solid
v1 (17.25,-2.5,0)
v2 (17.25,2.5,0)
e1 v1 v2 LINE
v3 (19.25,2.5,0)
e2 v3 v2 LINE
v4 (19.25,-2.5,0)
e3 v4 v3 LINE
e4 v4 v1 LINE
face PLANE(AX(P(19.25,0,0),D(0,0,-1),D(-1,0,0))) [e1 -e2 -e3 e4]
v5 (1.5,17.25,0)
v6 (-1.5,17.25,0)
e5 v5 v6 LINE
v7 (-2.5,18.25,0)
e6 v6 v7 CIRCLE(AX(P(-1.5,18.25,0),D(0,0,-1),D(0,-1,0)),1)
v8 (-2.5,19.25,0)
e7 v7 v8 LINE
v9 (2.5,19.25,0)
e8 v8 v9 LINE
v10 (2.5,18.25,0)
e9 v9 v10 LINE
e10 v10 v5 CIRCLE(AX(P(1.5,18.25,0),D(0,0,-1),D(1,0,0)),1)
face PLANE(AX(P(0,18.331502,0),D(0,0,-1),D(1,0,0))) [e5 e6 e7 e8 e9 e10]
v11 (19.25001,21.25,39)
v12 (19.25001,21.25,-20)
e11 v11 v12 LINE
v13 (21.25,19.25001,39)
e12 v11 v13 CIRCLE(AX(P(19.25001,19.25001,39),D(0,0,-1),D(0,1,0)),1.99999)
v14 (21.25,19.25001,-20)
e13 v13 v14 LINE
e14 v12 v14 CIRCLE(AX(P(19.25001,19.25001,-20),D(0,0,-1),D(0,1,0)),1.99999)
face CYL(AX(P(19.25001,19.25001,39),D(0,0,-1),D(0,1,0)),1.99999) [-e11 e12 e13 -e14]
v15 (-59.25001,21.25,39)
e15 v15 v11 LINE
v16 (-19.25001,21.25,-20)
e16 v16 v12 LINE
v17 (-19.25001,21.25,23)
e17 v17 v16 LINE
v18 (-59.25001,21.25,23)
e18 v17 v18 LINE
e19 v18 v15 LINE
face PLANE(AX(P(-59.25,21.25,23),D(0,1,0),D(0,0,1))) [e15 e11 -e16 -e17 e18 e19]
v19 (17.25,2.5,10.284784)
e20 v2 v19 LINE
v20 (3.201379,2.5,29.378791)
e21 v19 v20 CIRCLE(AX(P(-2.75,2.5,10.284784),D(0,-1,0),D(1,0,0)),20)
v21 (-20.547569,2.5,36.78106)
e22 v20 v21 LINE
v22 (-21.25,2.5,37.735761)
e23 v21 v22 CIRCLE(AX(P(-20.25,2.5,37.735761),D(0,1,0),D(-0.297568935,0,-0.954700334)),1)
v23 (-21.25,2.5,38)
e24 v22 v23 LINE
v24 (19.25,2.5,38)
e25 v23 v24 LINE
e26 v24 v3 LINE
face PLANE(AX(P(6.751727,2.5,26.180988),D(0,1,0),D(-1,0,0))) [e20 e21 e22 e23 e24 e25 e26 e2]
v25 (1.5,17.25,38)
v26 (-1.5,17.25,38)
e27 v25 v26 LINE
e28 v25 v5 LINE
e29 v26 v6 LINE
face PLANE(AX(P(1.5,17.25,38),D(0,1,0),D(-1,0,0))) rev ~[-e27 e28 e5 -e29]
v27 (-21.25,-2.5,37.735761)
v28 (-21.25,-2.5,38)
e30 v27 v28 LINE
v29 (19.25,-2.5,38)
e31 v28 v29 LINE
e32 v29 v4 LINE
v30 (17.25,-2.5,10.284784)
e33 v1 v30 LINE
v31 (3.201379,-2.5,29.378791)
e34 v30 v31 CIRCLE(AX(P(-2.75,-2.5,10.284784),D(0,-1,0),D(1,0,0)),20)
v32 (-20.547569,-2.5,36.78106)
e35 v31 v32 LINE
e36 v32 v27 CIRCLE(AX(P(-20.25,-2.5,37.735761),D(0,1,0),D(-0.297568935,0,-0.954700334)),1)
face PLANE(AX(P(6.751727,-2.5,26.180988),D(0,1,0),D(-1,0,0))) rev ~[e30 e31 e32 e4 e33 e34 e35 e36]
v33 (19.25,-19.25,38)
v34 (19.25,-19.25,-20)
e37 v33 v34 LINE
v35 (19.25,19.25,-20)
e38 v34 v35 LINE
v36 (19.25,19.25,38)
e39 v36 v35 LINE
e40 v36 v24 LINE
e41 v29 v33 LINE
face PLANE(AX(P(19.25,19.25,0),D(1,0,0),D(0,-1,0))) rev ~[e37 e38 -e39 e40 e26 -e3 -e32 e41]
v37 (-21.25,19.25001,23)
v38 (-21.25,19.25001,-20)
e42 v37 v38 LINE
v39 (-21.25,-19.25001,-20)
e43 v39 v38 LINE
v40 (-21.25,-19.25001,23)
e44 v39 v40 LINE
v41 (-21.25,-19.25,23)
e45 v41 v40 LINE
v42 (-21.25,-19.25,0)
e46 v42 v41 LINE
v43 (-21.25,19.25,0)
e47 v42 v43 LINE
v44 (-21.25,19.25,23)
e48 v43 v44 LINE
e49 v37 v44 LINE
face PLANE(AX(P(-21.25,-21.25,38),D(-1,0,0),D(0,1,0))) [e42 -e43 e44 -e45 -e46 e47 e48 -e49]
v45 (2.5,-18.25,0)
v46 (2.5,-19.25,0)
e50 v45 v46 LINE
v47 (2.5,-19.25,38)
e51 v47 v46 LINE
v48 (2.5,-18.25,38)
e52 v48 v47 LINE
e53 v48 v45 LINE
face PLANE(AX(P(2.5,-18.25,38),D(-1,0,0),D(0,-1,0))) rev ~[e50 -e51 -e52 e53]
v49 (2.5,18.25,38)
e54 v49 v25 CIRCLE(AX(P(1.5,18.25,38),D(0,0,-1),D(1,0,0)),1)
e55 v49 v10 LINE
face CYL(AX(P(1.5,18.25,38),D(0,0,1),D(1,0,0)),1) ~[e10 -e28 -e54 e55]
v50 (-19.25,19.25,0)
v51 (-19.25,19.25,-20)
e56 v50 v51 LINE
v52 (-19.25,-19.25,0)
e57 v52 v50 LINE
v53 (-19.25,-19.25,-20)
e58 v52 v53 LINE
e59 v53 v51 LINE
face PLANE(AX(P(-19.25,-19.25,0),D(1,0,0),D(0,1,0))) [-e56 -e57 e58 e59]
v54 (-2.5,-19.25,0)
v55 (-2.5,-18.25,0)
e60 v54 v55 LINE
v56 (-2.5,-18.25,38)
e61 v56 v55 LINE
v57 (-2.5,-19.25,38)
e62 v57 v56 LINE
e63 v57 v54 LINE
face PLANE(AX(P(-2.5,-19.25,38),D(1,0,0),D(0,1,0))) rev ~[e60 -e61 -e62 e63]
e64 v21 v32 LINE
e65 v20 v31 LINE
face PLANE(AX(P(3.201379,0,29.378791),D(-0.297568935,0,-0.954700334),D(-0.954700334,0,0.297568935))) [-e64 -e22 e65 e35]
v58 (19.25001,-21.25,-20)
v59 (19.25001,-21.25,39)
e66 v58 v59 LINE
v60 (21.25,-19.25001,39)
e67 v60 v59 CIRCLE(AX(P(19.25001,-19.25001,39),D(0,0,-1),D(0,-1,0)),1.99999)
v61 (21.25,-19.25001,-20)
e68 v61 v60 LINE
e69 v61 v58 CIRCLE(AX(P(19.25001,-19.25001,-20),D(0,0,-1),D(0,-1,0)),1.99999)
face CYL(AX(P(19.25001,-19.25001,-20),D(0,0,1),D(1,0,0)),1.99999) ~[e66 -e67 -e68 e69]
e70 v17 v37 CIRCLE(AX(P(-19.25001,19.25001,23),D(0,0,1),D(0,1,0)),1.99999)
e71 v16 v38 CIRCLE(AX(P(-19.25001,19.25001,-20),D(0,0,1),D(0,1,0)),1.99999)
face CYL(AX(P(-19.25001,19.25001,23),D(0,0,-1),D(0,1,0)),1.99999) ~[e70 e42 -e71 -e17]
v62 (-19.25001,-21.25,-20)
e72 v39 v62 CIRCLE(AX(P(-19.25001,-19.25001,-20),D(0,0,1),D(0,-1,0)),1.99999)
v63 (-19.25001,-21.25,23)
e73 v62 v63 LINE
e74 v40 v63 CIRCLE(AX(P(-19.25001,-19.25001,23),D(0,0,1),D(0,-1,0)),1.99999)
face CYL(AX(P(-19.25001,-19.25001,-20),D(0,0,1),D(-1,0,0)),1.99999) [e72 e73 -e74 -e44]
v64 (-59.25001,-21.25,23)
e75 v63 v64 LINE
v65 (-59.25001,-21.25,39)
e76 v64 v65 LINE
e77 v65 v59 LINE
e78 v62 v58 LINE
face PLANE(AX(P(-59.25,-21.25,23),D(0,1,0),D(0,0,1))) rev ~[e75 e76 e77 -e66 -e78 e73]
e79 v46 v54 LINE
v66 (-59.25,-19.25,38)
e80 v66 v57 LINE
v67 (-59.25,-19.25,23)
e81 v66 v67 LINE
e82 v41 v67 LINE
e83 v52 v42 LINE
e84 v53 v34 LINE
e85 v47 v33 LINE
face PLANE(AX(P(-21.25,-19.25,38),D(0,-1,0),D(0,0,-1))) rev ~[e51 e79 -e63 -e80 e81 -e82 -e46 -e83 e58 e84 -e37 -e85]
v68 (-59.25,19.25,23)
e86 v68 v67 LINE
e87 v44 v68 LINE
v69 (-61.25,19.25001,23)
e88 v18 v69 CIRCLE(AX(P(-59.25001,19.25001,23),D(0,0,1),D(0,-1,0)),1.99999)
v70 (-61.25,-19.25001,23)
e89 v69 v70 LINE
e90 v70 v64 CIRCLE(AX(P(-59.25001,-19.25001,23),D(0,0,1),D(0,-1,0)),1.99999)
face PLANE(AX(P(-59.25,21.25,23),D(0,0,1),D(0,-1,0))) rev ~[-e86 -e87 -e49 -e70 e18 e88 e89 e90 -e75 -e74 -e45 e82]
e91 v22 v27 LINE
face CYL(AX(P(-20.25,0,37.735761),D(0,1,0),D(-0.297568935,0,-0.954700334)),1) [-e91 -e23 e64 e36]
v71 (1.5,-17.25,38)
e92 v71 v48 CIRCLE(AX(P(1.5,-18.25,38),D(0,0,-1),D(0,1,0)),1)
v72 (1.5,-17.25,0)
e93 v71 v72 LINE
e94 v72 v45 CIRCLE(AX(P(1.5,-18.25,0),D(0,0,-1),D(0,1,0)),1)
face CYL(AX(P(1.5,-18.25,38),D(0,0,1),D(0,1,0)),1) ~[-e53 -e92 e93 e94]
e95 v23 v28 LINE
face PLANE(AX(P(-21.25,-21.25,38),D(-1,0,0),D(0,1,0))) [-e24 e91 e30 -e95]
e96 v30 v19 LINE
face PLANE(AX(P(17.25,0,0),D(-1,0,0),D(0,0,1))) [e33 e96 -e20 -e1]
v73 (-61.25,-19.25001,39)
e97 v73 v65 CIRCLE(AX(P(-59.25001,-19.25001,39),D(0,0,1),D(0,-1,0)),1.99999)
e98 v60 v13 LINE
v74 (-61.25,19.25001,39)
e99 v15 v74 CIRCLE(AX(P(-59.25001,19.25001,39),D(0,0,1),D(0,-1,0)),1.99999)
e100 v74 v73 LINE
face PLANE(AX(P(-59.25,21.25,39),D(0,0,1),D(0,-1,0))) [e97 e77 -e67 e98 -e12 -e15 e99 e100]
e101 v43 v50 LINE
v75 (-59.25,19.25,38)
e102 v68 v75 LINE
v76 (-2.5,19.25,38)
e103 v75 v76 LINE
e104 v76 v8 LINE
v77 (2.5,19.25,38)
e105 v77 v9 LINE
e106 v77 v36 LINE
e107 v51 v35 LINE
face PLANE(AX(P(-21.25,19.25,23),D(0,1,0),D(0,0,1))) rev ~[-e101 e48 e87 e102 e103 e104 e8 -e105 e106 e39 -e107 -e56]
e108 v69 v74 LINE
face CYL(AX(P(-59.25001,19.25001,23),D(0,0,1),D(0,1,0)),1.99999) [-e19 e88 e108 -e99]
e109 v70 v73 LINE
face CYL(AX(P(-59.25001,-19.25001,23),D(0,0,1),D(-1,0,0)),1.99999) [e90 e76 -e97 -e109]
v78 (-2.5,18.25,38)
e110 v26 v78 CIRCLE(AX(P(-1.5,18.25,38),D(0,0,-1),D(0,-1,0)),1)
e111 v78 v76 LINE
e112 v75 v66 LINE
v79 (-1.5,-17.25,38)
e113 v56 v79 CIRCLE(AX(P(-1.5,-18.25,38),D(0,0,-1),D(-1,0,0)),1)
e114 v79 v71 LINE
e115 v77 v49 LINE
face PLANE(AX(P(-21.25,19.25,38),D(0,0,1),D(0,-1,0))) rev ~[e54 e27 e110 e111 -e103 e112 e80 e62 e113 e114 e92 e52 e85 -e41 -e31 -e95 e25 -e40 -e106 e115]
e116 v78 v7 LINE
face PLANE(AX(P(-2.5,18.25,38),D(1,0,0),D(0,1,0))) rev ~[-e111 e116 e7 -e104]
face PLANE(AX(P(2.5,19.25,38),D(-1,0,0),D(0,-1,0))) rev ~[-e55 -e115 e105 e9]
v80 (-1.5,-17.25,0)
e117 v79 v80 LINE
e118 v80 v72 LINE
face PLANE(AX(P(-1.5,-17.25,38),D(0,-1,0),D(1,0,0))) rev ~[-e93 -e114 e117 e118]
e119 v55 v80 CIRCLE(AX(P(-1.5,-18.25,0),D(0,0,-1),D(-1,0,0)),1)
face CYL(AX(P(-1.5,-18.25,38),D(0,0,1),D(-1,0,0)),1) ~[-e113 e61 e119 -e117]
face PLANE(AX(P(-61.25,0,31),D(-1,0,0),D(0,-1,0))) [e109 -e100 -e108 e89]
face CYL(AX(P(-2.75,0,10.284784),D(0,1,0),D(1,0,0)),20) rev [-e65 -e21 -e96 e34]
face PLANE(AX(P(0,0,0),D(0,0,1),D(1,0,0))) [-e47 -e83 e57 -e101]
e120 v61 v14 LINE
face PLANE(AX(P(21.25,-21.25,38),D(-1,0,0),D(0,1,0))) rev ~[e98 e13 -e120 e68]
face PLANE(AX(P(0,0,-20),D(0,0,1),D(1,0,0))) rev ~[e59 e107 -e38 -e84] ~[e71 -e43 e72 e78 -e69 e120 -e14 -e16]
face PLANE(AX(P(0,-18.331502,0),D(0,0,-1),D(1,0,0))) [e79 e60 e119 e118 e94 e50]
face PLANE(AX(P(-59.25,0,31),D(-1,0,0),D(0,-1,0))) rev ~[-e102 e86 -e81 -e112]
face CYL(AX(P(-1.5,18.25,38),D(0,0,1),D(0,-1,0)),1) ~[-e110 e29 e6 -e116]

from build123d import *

# Parameters (mm, degrees)
F0_W      = 42.5
F0_H      = 42.5
F0_W_2    = 38.5
F0_H_2    = 38.5
F1_DEPTH  = 20
F3_DEPTH  = 38
F4_W      = 42.5
F4_H      = 42.5
F5_DEPTH  = 1
F9_DEPTH  = 2.5
F11_DEPTH = 38
F12_W     = 42.5
F12_H     = 16
F13_DEPTH = 2
F15_DEPTH = 38
F16_R     = 1.99999


# Not quite as in the source:
# - a fillet or chamfer is up to 0.001 mm smaller than in the source, because OpenCascade refuses the exact size


with BuildPart() as f1:
    # F0 (on Top) → F1 (new body)
    with BuildSketch(Plane.XY):
        Rectangle(F0_W, F0_H)
        Rectangle(F0_W_2, F0_H_2, mode=Mode.SUBTRACT)
    extrude(amount=-F1_DEPTH)

    # F2 (on face) → F3 (join)
    with BuildSketch(Plane.XY):
        Polygon((-21.25, -19.25), (-21.25, -21.25), (21.25, -21.25), (21.25, 21.25), (-21.25, 21.25), (-21.25, 19.25), (-19.25, 19.25), (19.25, 19.25), (19.25, -19.25), (-19.25, -19.25), align=None)
    extrude(amount=F3_DEPTH)

    # F4 (on face) → F5 (join)
    with BuildSketch(Plane.XY.offset(38)):
        Rectangle(F4_W, F4_H)
    extrude(amount=F5_DEPTH)

    # F8 (on plane+point) → F9 (join, symmetric)
    with BuildSketch(Plane(origin=(0, 0, 0), x_dir=(-1, 0, 0), z_dir=(0, 1, 0))):
        with BuildLine():
            Line((21.25, 37.7357607819), (21.25, 38))
            Line((21.25, 38), (-19.25, 38))
            Line((-19.25, 38), (-19.25, 0))
            Line((-19.25, 0), (-17.25, 0))
            Line((-17.25, 0), (-17.25, 10.2847843622))
            ThreePointArc((-17.25, 10.2847843622), (-13.3594316189, 22.1374723659), (-3.2013787085, 29.3787910519))
            Line((-3.2013787085, 29.3787910519), (20.5475689354, 36.7810604474))
            ThreePointArc((20.5475689354, 36.7810604474), (21.0554715809, 37.1431263817), (21.25, 37.7357607819))
        make_face()
    extrude(amount=F9_DEPTH, both=True)

    # F10 (on face) → F11 (join)
    with BuildSketch(Plane(origin=(-21.25, 0, 0), x_dir=(0, -1, 0), z_dir=(-1, 0, 0))):
        Polygon((2.5, 38), (19.25, 38), (19.25, 23), (21.25, 23), (21.25, 39), (-21.25, 39), (-21.25, 23), (-19.25, 23), (-19.25, 38), (-2.5, 38), align=None)
    extrude(amount=F11_DEPTH)

    # F12 (on face) → F13 (join)
    with BuildSketch(Plane(origin=(-59.25, 0, 0), x_dir=(0, -1, 0), z_dir=(-1, 0, 0))):
        with Locations((0, 31)):
            Rectangle(F12_W, F12_H)
    extrude(amount=F13_DEPTH)

    # F14 (on face) → F15 (join, through all)
    with BuildSketch(Plane(origin=(0, 0, 38), x_dir=(1, 0, 0), z_dir=(0, 0, -1))):
        with BuildLine():
            Line((2.5, 18.25), (2.5, 19.25))
            Line((2.5, 19.25), (-2.5, 19.25))
            Line((-2.5, 19.25), (-2.5, 18.25))
            ThreePointArc((-2.5, 18.25), (-2.2071067812, 17.5428932188), (-1.5, 17.25))
            Line((-1.5, 17.25), (1.5, 17.25))
            ThreePointArc((1.5, 17.25), (2.2071067812, 17.5428932188), (2.5, 18.25))
        make_face()
        with BuildLine():
            Line((-2.5, -18.25), (-2.5, -19.25))
            Line((-2.5, -19.25), (2.5, -19.25))
            Line((2.5, -19.25), (2.5, -18.25))
            ThreePointArc((2.5, -18.25), (2.2071067812, -17.5428932188), (1.5, -17.25))
            Line((1.5, -17.25), (-1.5, -17.25))
            ThreePointArc((-1.5, -17.25), (-2.2071067812, -17.5428932188), (-2.5, -18.25))
        make_face()
    extrude(amount=F15_DEPTH)

    # F16 (radius 2 in the source; OpenCascade refuses exactly that, so slightly less here)
    f16_edges = [f1.edges().sort_by_distance(p)[0] for p in [
        (21.25, 21.25, 9.5),
        (-21.25, 21.25, 1.5),
        (-61.25, 21.25, 31),
        (-61.25, -21.25, 31),
        (-21.25, -21.25, 1.5),
        (21.25, -21.25, 9.5),
    ]]
    fillet(f16_edges, radius=F16_R)


solid = f1.part
